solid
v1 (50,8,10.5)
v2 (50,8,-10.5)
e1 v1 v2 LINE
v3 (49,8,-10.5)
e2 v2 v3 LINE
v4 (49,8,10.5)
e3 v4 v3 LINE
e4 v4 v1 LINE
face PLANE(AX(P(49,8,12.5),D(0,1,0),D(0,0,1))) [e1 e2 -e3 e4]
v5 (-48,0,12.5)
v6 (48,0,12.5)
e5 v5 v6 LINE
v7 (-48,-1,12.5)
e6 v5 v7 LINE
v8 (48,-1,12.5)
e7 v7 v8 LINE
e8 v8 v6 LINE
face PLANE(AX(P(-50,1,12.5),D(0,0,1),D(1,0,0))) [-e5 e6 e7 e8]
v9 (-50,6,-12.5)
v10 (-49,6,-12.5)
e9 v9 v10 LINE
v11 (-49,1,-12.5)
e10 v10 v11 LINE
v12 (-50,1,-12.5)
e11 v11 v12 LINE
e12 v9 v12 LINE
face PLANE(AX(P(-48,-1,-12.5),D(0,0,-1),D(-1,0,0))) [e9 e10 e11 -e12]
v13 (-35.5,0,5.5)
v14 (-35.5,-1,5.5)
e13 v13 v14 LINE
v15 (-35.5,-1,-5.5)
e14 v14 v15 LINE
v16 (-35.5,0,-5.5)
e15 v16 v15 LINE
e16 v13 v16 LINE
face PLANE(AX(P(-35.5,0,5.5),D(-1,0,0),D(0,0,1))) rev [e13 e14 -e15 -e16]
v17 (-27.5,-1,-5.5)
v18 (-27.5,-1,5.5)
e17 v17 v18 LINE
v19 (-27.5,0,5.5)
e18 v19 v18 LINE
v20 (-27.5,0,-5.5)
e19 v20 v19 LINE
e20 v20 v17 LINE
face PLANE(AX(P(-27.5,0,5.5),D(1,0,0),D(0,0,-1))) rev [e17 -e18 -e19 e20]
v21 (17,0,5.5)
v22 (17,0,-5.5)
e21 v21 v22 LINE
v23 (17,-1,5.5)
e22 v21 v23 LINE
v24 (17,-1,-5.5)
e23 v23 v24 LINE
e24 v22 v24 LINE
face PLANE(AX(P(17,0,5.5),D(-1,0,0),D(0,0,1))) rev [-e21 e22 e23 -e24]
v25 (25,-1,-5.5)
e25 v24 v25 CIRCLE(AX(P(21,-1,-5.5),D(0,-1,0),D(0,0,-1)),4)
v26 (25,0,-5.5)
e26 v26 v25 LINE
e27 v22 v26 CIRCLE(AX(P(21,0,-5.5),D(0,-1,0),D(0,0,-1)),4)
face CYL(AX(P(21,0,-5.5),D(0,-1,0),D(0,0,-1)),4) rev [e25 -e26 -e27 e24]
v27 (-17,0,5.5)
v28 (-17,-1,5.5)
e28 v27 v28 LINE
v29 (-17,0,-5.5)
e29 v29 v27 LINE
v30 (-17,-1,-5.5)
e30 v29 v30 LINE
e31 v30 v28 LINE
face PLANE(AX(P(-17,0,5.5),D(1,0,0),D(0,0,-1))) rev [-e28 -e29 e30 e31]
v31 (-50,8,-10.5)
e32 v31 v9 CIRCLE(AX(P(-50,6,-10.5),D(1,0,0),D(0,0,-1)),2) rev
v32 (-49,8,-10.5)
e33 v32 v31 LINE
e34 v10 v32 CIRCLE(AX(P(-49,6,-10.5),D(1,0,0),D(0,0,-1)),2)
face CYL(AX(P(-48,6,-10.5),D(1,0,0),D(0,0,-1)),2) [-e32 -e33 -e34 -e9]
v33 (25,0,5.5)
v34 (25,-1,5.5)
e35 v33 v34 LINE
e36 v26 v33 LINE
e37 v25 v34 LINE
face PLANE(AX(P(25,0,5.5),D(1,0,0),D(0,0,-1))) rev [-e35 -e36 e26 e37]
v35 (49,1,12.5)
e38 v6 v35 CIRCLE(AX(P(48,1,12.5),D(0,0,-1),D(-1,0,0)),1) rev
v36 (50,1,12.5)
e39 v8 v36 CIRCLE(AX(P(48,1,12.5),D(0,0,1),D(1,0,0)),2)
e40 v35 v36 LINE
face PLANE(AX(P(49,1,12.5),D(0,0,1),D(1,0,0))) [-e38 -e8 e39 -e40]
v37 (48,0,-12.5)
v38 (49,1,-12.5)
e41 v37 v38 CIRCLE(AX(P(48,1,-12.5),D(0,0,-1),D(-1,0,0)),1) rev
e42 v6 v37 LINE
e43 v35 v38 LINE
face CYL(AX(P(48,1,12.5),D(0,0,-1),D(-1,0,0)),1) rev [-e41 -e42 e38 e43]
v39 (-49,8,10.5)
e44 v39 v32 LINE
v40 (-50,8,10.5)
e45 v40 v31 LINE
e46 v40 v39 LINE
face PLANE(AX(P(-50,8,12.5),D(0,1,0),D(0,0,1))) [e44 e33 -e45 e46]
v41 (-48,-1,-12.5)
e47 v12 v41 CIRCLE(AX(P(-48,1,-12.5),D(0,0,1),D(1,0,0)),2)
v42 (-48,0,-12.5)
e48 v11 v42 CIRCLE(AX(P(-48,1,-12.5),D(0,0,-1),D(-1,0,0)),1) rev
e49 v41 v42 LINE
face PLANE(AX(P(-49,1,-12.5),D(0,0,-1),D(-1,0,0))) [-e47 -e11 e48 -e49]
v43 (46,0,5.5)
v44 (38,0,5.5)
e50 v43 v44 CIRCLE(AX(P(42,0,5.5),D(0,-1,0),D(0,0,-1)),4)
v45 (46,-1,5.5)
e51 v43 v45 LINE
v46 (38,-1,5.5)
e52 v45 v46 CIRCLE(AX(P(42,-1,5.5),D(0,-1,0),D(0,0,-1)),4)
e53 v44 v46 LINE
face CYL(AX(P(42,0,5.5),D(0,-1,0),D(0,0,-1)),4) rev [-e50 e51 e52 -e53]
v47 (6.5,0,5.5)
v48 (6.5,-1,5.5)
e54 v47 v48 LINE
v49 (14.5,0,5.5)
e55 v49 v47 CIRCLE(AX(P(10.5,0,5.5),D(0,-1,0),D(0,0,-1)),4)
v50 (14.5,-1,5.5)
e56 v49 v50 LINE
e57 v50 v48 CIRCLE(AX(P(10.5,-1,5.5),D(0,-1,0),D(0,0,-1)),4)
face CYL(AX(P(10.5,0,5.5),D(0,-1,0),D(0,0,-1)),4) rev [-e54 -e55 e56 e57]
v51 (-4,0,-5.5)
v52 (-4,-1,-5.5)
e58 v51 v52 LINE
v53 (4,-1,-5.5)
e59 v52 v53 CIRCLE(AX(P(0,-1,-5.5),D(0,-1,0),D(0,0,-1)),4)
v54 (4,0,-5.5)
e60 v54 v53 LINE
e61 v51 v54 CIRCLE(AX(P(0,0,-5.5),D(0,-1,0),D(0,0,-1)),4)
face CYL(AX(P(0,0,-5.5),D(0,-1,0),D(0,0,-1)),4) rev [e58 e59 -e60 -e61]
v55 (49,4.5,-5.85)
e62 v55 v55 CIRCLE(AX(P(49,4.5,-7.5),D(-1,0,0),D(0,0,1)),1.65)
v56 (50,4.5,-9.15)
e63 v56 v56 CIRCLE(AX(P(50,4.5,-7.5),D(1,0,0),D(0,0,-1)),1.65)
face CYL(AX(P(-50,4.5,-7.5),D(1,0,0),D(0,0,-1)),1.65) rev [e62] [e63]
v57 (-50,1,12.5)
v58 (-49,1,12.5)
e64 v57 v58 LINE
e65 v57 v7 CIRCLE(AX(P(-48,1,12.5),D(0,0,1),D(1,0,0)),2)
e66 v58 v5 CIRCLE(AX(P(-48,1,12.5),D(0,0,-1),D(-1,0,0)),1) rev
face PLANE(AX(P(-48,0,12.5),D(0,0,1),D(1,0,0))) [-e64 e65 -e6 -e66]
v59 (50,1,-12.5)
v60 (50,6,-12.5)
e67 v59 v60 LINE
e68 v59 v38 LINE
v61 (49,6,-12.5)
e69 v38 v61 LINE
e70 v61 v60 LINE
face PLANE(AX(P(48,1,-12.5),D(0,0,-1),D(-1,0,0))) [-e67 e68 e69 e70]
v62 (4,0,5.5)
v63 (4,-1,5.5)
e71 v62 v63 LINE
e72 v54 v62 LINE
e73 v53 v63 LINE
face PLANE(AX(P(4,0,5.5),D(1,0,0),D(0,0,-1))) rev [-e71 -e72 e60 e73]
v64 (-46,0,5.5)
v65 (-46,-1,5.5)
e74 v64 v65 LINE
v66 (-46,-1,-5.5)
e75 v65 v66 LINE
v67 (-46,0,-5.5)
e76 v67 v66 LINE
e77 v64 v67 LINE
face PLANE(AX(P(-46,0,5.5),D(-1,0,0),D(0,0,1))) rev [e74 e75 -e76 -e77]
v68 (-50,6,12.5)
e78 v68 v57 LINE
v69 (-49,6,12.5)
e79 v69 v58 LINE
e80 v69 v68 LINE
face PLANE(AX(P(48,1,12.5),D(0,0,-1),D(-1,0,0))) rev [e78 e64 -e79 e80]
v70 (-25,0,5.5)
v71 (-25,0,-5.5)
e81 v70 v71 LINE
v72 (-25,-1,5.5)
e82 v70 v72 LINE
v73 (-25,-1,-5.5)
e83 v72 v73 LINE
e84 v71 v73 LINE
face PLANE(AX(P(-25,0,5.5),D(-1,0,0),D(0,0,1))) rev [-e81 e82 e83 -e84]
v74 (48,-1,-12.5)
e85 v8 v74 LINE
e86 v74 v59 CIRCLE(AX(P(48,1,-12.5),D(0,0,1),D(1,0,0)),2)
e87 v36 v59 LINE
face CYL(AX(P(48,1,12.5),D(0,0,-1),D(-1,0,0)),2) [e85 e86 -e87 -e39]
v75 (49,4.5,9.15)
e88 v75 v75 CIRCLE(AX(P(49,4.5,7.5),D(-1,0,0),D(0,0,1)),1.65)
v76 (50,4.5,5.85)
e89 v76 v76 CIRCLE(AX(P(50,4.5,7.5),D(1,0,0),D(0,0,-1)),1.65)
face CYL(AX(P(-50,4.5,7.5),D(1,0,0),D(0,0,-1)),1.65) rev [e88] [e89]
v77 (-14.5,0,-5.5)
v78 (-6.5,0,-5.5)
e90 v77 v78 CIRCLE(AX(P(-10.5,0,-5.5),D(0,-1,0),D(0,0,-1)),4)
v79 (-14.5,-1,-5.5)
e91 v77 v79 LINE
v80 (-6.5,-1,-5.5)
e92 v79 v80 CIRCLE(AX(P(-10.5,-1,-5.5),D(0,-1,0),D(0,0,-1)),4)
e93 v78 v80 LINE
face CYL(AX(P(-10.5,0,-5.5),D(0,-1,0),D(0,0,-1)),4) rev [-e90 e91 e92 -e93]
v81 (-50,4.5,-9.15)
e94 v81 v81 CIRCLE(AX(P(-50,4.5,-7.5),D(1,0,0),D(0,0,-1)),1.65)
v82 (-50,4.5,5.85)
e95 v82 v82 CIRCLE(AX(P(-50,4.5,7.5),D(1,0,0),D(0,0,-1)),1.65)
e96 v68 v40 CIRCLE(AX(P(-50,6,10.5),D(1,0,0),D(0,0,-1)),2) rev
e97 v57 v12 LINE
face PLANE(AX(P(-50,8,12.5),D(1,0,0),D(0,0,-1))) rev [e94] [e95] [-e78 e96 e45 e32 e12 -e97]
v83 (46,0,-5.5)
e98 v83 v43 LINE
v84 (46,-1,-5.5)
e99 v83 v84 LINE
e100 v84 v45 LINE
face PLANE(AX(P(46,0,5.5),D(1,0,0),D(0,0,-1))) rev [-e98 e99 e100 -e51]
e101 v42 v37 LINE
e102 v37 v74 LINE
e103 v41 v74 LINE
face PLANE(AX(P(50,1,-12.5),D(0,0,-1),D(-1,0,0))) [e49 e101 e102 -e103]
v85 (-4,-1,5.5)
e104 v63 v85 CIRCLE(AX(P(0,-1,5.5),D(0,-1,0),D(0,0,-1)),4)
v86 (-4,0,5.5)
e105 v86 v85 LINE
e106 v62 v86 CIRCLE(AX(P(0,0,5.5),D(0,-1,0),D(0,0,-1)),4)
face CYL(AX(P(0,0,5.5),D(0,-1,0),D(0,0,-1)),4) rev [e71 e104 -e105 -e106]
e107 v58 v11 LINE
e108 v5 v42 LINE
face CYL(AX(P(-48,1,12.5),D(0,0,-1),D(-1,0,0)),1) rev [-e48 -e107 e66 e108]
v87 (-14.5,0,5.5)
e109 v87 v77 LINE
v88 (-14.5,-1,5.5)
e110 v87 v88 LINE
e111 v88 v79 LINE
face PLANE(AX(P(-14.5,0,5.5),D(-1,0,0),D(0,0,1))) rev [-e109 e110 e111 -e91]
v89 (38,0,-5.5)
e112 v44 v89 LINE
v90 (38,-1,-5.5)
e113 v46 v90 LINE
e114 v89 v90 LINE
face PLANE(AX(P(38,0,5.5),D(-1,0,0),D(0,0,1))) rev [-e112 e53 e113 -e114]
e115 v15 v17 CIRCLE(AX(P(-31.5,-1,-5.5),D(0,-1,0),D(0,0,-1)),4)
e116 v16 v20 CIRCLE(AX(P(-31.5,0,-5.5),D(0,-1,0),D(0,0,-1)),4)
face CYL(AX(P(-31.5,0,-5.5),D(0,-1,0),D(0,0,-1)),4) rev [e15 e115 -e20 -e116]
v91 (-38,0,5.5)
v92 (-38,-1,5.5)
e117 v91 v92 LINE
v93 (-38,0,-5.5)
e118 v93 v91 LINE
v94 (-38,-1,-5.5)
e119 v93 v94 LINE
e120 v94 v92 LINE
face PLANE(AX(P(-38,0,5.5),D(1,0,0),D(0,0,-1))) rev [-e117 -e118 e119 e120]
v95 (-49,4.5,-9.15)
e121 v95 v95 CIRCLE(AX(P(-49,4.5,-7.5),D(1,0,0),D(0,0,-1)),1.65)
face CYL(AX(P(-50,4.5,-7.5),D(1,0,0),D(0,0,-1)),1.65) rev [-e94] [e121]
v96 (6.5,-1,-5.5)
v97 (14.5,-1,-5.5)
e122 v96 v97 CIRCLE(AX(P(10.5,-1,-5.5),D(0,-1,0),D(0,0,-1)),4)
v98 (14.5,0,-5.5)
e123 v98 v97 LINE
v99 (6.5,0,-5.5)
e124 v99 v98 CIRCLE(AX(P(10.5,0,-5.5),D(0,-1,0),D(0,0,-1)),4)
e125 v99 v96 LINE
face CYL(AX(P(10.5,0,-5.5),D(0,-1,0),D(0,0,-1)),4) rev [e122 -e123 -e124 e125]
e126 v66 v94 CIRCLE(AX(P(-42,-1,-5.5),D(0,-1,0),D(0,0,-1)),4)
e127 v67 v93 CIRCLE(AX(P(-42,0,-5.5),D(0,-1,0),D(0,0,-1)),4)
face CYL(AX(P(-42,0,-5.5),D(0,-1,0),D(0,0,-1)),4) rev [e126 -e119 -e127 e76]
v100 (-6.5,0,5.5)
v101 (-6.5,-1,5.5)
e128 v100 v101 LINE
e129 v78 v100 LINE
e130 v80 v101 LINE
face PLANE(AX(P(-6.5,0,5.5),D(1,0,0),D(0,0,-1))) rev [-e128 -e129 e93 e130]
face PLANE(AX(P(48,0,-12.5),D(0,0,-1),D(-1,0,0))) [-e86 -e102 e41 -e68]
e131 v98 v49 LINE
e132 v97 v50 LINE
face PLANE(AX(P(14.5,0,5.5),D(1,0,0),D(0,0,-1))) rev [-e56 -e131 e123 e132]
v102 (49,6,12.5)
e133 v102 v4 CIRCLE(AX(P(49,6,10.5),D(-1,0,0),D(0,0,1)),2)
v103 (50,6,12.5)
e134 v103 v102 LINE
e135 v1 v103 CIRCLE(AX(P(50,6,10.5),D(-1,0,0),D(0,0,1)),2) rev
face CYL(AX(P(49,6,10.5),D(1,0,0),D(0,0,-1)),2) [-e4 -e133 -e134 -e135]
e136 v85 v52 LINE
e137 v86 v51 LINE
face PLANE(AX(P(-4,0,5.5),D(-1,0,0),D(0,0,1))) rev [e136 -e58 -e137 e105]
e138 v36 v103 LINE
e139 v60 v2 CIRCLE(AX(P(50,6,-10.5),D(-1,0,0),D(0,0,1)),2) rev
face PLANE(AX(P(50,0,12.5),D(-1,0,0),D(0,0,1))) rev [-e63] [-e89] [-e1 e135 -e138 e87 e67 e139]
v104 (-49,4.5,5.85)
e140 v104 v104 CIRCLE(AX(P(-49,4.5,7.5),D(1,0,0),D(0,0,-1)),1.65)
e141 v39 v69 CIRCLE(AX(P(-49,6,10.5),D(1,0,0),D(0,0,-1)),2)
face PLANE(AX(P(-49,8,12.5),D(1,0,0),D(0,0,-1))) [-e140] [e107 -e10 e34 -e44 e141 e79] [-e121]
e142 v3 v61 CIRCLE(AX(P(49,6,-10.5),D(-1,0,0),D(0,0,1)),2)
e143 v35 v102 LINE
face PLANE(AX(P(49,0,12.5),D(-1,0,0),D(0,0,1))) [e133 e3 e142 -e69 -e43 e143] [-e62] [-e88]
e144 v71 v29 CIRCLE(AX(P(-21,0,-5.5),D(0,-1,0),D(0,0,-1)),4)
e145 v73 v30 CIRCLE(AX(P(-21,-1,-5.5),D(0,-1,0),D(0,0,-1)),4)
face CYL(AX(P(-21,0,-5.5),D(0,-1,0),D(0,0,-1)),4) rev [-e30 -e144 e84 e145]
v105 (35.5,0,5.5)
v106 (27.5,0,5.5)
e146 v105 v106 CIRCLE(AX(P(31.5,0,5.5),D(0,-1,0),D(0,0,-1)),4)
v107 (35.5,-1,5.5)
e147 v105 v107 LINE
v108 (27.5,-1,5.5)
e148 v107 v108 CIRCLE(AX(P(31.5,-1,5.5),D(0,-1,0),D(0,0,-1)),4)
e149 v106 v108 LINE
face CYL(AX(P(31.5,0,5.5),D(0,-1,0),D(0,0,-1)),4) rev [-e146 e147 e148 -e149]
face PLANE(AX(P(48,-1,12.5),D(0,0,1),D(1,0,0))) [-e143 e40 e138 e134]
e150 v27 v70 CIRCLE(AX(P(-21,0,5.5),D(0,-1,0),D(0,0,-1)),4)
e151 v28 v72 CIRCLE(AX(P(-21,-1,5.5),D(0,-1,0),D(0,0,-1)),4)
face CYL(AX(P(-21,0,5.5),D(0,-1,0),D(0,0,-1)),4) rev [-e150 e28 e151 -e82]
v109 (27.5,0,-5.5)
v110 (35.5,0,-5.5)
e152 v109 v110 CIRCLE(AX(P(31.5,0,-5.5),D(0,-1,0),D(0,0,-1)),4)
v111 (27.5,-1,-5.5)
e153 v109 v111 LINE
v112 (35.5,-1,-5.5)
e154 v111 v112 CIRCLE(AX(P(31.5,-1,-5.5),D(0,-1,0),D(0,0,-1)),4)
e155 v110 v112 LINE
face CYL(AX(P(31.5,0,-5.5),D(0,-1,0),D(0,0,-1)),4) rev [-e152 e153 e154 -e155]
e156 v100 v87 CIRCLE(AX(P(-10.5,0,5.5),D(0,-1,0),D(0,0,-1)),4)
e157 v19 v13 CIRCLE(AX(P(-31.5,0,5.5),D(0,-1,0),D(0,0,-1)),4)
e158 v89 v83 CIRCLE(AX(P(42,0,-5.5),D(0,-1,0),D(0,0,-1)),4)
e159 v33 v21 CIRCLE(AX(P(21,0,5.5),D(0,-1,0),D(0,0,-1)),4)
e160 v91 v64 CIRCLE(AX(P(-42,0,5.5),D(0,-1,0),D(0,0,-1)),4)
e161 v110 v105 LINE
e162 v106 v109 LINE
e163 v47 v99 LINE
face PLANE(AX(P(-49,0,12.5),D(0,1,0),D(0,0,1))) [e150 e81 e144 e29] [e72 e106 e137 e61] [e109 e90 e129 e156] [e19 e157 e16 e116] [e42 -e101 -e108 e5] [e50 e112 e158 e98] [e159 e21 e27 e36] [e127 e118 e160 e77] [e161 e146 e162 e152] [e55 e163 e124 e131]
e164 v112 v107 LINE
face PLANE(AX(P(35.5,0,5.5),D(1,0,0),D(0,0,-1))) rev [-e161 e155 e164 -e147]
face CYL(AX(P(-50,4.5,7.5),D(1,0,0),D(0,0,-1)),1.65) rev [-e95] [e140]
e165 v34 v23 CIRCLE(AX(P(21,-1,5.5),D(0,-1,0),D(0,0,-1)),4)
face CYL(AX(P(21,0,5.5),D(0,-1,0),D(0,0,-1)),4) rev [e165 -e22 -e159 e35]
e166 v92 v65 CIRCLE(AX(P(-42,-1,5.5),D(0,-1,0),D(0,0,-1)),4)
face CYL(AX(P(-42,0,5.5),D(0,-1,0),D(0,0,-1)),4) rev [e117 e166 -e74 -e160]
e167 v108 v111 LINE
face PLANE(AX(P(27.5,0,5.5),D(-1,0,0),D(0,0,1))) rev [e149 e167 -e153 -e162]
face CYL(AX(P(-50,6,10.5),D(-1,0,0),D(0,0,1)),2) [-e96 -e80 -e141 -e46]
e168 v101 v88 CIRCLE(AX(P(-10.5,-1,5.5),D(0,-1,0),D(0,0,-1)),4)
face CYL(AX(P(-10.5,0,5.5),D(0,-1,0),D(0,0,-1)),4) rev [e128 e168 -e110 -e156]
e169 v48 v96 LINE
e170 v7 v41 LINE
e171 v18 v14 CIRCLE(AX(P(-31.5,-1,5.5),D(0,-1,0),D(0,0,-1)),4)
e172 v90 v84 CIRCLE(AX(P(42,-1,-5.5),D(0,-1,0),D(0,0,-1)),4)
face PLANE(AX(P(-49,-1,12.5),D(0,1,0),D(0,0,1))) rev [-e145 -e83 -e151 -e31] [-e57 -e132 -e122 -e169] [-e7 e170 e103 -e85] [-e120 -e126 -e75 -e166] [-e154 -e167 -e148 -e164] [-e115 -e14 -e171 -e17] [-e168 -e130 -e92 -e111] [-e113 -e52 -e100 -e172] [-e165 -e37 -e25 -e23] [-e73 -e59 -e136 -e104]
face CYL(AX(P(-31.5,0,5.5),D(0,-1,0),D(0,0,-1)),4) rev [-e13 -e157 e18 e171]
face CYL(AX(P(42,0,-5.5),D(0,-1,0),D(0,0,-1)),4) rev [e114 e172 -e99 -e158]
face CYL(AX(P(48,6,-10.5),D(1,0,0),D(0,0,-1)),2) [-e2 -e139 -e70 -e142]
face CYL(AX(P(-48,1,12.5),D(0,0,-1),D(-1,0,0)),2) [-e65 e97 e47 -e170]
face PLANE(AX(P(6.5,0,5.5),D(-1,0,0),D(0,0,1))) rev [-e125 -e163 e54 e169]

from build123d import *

# Parameters (mm, degrees)
SM_BASE_FLANGE_1_DEPTH   = 12.5
CUT_EXTRUDE_1_DEPTH      = 53.156015952
CUT_EXTRUDE_1_DEPTH_BACK = 53.156015952
SKETCH_6_R               = 1.65
CUT_EXTRUDE_2_DEPTH      = 10
FILLET_1_R               = 2


# Sheet-metal steps are written as plain solids
with BuildPart() as part:
    # Sketch 1 → 基体-法兰1 (new, symmetric)
    with BuildSketch(Plane.XY):
        with BuildLine():
            Line((-49, 8), (-49, 1))
            ThreePointArc((-49, 1), (-48.707106781, 0.292893219), (-48, 0))
            Line((-48, 0), (48, 0))
            ThreePointArc((48, 0), (48.707106781, 0.292893219), (49, 1))
            Line((49, 1), (49, 8))
            Line((49, 8), (50, 8))
            Line((50, 8), (50, 1))
            ThreePointArc((50, 1), (49.414213562, -0.414213562), (48, -1))
            Line((48, -1), (-48, -1))
            ThreePointArc((-48, -1), (-49.414213562, -0.414213562), (-50, 1))
            Line((-50, 1), (-50, 8))
            Line((-50, 8), (-49, 8))
        make_face()
    extrude(amount=SM_BASE_FLANGE_1_DEPTH, both=True)

    # 草图6 → 切除-拉伸1 (cut, two sides: drawn at the far end of the back side and taken through both)
    with BuildSketch(Plane(origin=(0, 0, 0), x_dir=(0, 0, -1), z_dir=(1, 0, 0)).offset(-CUT_EXTRUDE_1_DEPTH_BACK)):
        with Locations((-7.5, 4.5)):
            Circle(SKETCH_6_R)
        with Locations((7.5, 4.5)):
            Circle(SKETCH_6_R)
    extrude(amount=CUT_EXTRUDE_1_DEPTH + CUT_EXTRUDE_1_DEPTH_BACK, mode=Mode.SUBTRACT)

    # 草图7 → 切除-拉伸2 (cut)
    with BuildSketch(Plane.XZ.offset(1)):
        with BuildLine():
            Line((46, 5.5), (46, -5.5))
            ThreePointArc((46, -5.5), (42, -9.5), (38, -5.5))
            Line((38, -5.5), (38, 5.5))
            ThreePointArc((38, 5.5), (42, 9.5), (46, 5.5))
        make_face()
        with BuildLine():
            Line((-38, 5.5), (-38, -5.5))
            ThreePointArc((-38, -5.5), (-42, -9.5), (-46, -5.5))
            Line((-46, -5.5), (-46, 5.5))
            ThreePointArc((-46, 5.5), (-42, 9.5), (-38, 5.5))
        make_face()
        with BuildLine():
            Line((-27.5, 5.5), (-27.5, -5.5))
            ThreePointArc((-27.5, -5.5), (-31.5, -9.5), (-35.5, -5.5))
            Line((-35.5, -5.5), (-35.5, 5.5))
            ThreePointArc((-35.5, 5.5), (-31.5, 9.5), (-27.5, 5.5))
        make_face()
        with BuildLine():
            Line((-17, 5.5), (-17, -5.5))
            ThreePointArc((-17, -5.5), (-21, -9.5), (-25, -5.5))
            Line((-25, -5.5), (-25, 5.5))
            ThreePointArc((-25, 5.5), (-21, 9.5), (-17, 5.5))
        make_face()
        with BuildLine():
            Line((-6.5, 5.5), (-6.5, -5.5))
            ThreePointArc((-6.5, -5.5), (-10.5, -9.5), (-14.5, -5.5))
            Line((-14.5, -5.5), (-14.5, 5.5))
            ThreePointArc((-14.5, 5.5), (-10.5, 9.5), (-6.5, 5.5))
        make_face()
        with BuildLine():
            Line((4, 5.5), (4, -5.5))
            ThreePointArc((4, -5.5), (0, -9.5), (-4, -5.5))
            Line((-4, -5.5), (-4, 5.5))
            ThreePointArc((-4, 5.5), (0, 9.5), (4, 5.5))
        make_face()
        with BuildLine():
            Line((14.5, 5.5), (14.5, -5.5))
            ThreePointArc((14.5, -5.5), (10.5, -9.5), (6.5, -5.5))
            Line((6.5, -5.5), (6.5, 5.5))
            ThreePointArc((6.5, 5.5), (10.5, 9.5), (14.5, 5.5))
        make_face()
        with BuildLine():
            Line((25, 5.5), (25, -5.5))
            ThreePointArc((25, -5.5), (21, -9.5), (17, -5.5))
            Line((17, -5.5), (17, 5.5))
            ThreePointArc((17, 5.5), (21, 9.5), (25, 5.5))
        make_face()
        with BuildLine():
            Line((35.5, 5.5), (35.5, -5.5))
            ThreePointArc((35.5, -5.5), (31.5, -9.5), (27.5, -5.5))
            Line((27.5, -5.5), (27.5, 5.5))
            ThreePointArc((27.5, 5.5), (31.5, 9.5), (35.5, 5.5))
        make_face()
    extrude(amount=-CUT_EXTRUDE_2_DEPTH, mode=Mode.SUBTRACT)

    # 圆角1
    fillet_1_edges = [part.edges().sort_by_distance(p)[0] for p in [
        (-49.5, 8, -12.5),
        (49.5, 8, -12.5),
        (-49.5, 8, 12.5),
        (49.5, 8, 12.5),
    ]]
    fillet(fillet_1_edges, radius=FILLET_1_R)


solid = part.part
